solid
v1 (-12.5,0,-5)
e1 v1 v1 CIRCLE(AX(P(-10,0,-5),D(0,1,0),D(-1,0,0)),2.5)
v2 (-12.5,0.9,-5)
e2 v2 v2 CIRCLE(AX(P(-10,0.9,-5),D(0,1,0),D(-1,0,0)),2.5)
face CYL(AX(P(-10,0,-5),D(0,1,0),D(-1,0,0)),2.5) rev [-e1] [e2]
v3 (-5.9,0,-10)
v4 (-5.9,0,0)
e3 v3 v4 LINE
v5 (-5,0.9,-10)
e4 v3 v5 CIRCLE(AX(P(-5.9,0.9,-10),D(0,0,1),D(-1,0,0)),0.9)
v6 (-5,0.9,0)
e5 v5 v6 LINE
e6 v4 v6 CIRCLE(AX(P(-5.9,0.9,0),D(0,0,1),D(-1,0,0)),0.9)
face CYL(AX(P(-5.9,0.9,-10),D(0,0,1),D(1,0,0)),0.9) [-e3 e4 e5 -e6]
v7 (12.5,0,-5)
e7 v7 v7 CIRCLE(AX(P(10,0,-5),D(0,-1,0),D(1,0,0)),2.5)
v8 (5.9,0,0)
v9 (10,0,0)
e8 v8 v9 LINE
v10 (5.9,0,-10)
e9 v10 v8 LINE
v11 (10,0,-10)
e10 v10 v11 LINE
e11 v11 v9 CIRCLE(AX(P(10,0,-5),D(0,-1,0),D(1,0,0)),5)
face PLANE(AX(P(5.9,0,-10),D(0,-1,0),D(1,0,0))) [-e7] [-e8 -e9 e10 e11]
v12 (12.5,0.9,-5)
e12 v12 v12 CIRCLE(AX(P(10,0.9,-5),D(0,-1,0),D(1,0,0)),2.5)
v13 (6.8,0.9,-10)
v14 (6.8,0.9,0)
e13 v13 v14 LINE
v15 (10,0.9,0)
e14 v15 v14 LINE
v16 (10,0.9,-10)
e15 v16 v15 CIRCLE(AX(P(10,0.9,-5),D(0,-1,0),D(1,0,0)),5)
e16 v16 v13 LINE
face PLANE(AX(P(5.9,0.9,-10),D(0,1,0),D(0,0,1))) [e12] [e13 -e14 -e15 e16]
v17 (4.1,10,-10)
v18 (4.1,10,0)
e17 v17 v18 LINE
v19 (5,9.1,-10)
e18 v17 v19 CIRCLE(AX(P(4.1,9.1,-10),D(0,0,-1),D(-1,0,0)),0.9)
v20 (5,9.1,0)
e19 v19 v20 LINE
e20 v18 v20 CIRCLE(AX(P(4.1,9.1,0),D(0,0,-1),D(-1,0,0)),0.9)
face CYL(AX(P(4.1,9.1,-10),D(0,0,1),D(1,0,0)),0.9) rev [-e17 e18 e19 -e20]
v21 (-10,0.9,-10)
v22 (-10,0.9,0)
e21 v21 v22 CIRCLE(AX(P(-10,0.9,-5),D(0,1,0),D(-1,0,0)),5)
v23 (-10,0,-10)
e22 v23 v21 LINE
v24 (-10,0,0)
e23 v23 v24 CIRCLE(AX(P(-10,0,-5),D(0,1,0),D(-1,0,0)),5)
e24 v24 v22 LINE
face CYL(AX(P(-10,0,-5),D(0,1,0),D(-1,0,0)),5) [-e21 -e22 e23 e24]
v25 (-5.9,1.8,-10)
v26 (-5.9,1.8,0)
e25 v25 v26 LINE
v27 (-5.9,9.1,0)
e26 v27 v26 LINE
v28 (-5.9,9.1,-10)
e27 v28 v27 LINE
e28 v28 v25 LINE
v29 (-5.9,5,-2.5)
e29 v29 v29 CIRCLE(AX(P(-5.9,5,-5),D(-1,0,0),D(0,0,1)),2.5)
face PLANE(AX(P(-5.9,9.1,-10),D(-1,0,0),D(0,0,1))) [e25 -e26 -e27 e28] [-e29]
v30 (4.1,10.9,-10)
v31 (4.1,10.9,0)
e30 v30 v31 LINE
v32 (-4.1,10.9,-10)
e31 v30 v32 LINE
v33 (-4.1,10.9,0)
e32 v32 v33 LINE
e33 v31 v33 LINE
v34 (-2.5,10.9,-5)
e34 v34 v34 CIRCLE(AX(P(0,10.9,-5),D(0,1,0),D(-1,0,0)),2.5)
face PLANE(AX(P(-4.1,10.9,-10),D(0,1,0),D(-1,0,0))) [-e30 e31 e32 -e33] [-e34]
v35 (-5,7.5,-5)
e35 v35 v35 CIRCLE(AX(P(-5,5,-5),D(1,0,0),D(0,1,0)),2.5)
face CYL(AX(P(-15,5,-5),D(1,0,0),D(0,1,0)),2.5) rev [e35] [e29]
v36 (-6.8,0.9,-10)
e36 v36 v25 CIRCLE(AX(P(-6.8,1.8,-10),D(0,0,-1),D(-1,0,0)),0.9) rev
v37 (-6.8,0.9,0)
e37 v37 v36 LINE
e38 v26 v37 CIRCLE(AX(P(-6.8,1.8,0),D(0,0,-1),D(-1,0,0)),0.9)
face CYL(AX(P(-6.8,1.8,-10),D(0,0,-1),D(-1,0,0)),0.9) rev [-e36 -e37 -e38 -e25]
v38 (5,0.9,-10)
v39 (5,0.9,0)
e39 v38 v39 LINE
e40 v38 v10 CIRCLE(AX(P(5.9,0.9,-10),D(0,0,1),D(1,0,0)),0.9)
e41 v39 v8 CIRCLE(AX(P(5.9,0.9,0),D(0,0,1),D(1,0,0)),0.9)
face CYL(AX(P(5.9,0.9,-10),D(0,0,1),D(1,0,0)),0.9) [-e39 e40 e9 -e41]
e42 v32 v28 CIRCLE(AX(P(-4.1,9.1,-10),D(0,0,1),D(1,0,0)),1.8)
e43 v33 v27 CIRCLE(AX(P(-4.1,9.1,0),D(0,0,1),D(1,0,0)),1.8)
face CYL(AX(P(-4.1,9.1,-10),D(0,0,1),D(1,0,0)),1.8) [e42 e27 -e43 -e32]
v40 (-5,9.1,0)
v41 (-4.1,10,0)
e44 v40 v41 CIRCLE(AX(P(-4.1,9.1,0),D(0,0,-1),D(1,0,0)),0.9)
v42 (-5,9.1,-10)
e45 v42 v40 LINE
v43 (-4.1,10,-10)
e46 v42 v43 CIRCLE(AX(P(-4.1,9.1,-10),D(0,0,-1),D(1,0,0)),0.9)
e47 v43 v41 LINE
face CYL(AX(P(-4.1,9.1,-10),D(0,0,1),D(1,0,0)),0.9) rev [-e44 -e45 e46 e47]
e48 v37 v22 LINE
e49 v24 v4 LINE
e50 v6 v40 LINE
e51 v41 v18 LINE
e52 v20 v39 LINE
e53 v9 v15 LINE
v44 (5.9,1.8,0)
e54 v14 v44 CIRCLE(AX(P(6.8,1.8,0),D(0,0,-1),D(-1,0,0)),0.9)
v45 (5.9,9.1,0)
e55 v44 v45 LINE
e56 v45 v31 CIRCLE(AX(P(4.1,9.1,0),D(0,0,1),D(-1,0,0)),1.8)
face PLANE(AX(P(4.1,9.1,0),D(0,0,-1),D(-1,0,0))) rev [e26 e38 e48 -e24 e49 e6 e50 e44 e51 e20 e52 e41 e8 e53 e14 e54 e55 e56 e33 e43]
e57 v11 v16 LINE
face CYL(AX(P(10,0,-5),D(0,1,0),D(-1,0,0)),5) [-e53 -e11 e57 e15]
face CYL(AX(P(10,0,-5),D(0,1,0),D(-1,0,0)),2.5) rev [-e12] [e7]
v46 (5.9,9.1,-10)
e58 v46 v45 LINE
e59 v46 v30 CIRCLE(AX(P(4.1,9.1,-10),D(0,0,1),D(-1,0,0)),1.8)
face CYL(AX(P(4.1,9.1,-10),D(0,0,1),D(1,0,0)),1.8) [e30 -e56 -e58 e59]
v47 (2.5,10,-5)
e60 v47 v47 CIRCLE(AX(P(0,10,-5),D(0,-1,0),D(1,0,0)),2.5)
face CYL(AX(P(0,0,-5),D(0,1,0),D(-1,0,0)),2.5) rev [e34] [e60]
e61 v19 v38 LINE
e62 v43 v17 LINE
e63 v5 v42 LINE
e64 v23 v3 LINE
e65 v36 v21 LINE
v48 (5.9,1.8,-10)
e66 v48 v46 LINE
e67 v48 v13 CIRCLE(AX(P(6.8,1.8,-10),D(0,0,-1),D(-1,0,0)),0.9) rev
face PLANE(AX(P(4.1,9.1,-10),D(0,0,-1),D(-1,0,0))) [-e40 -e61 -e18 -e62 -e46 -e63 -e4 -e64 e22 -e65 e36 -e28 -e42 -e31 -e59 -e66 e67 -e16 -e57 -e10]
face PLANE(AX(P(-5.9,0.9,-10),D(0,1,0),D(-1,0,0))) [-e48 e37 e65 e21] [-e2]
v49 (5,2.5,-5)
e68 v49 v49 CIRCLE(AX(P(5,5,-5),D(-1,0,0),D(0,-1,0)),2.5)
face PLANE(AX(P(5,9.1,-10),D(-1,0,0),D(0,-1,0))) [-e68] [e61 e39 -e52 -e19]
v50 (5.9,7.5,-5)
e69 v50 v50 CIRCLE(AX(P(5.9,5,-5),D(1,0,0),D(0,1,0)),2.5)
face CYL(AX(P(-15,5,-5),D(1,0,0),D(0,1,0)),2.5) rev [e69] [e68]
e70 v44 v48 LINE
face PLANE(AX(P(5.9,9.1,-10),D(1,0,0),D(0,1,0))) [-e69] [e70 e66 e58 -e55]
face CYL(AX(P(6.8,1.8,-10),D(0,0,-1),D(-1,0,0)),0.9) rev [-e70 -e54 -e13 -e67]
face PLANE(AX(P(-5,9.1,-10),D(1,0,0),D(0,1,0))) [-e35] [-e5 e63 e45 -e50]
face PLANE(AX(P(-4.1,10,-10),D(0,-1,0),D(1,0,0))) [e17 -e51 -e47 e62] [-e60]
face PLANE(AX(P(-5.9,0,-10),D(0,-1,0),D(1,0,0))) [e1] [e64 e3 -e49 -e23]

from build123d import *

# Parameters (mm, degrees)
BASE_FLANGE1_DEPTH = 10
FILLET1_R          = 0.9
SKETCH6_R          = 2.5
CUT_EXTRUDE3_DEPTH = 21.615528128
SKETCH7_R          = 2.5
CUT_EXTRUDE4_DEPTH = 22.066798523
SKETCH8_R          = 2.5
CUT_EXTRUDE5_DEPTH = 26.605077621


# Sheet-metal steps are written as plain solids
with BuildPart() as part:
    # Sketch1 → Base-Flange1 (new body)
    with BuildSketch(Plane.XY):
        with BuildLine():
            Line((-4.1, 10), (4.1, 10))
            ThreePointArc((4.1, 10), (4.736396103, 9.736396103), (5, 9.1))
            Line((5, 9.1), (5, 0.9))
            ThreePointArc((5, 0.9), (5.263603897, 0.263603897), (5.9, 0))
            Line((5.9, 0), (15, 0))
            Line((15, 0), (15, 0.9))
            Line((15, 0.9), (5.9, 0.9))
            Line((5.9, 0.9), (5.9, 9.1))
            ThreePointArc((5.9, 9.1), (5.372792206, 10.372792206), (4.1, 10.9))
            Line((4.1, 10.9), (-4.1, 10.9))
            ThreePointArc((-4.1, 10.9), (-5.372792206, 10.372792206), (-5.9, 9.1))
            Line((-5.9, 9.1), (-5.9, 0.9))
            Line((-5.9, 0.9), (-15, 0.9))
            Line((-15, 0.9), (-15, 0))
            Line((-15, 0), (-5.9, 0))
            ThreePointArc((-5.9, 0), (-5.263603897, 0.263603897), (-5, 0.9))
            Line((-5, 0.9), (-5, 9.1))
            ThreePointArc((-5, 9.1), (-4.736396103, 9.736396103), (-4.1, 10))
        make_face()
    extrude(amount=-BASE_FLANGE1_DEPTH)

    # Fillet1
    fillet1_edges = [part.edges().sort_by_distance(p)[0] for p in [
        (-5.9, 0.9, -5),
        (5.9, 0.9, -5),
    ]]
    fillet(fillet1_edges, radius=FILLET1_R)

    # Sketch6 → Cut-Extrude3 (cut, through all)
    with BuildSketch(Plane(origin=(0, 0.9, 0), x_dir=(1, 0, 0), z_dir=(0, 1, 0))):
        with Locations(Location((-10, 5, 0), (0, 0, 180))):
            Circle(SKETCH6_R)
        with BuildLine():
            Line((-15, 10), (-15, 5))
            ThreePointArc((-15, 5), (-13.535533906, 8.535533906), (-10, 10))
            Line((-10, 10), (-15, 10))
        make_face()
        with BuildLine():
            Line((-15, 0), (-10, 0))
            ThreePointArc((-10, 0), (-13.535533906, 1.464466094), (-15, 5))
            Line((-15, 5), (-15, 0))
        make_face()
    cut_extrude3 = extrude(amount=-CUT_EXTRUDE3_DEPTH, mode=Mode.SUBTRACT)

    # Mirror1: Cut-Extrude3 across plane
    add(cut_extrude3.mirror(Plane(origin=(0, 0, 0), x_dir=(0, 0, 1), z_dir=(1, 0, 0))), mode=Mode.SUBTRACT)

    # Sketch7 → Cut-Extrude4 (cut, through all)
    with BuildSketch(Plane(origin=(0, 10.9, 0), x_dir=(1, 0, 0), z_dir=(0, 1, 0))):
        with Locations(Location((0, 5, 0), (0, 0, 180))):
            Circle(SKETCH7_R)
    extrude(amount=-CUT_EXTRUDE4_DEPTH, mode=Mode.SUBTRACT)

    # Sketch8 → Cut-Extrude5 (cut, through all)
    with BuildSketch(Plane(origin=(5.9, 0, 0), x_dir=(0, 0, -1), z_dir=(1, 0, 0))):
        with Locations(Location((5, 5, 0), (0, 0, 90))):
            Circle(SKETCH8_R)
    extrude(amount=-CUT_EXTRUDE5_DEPTH, mode=Mode.SUBTRACT)


solid = part.part
